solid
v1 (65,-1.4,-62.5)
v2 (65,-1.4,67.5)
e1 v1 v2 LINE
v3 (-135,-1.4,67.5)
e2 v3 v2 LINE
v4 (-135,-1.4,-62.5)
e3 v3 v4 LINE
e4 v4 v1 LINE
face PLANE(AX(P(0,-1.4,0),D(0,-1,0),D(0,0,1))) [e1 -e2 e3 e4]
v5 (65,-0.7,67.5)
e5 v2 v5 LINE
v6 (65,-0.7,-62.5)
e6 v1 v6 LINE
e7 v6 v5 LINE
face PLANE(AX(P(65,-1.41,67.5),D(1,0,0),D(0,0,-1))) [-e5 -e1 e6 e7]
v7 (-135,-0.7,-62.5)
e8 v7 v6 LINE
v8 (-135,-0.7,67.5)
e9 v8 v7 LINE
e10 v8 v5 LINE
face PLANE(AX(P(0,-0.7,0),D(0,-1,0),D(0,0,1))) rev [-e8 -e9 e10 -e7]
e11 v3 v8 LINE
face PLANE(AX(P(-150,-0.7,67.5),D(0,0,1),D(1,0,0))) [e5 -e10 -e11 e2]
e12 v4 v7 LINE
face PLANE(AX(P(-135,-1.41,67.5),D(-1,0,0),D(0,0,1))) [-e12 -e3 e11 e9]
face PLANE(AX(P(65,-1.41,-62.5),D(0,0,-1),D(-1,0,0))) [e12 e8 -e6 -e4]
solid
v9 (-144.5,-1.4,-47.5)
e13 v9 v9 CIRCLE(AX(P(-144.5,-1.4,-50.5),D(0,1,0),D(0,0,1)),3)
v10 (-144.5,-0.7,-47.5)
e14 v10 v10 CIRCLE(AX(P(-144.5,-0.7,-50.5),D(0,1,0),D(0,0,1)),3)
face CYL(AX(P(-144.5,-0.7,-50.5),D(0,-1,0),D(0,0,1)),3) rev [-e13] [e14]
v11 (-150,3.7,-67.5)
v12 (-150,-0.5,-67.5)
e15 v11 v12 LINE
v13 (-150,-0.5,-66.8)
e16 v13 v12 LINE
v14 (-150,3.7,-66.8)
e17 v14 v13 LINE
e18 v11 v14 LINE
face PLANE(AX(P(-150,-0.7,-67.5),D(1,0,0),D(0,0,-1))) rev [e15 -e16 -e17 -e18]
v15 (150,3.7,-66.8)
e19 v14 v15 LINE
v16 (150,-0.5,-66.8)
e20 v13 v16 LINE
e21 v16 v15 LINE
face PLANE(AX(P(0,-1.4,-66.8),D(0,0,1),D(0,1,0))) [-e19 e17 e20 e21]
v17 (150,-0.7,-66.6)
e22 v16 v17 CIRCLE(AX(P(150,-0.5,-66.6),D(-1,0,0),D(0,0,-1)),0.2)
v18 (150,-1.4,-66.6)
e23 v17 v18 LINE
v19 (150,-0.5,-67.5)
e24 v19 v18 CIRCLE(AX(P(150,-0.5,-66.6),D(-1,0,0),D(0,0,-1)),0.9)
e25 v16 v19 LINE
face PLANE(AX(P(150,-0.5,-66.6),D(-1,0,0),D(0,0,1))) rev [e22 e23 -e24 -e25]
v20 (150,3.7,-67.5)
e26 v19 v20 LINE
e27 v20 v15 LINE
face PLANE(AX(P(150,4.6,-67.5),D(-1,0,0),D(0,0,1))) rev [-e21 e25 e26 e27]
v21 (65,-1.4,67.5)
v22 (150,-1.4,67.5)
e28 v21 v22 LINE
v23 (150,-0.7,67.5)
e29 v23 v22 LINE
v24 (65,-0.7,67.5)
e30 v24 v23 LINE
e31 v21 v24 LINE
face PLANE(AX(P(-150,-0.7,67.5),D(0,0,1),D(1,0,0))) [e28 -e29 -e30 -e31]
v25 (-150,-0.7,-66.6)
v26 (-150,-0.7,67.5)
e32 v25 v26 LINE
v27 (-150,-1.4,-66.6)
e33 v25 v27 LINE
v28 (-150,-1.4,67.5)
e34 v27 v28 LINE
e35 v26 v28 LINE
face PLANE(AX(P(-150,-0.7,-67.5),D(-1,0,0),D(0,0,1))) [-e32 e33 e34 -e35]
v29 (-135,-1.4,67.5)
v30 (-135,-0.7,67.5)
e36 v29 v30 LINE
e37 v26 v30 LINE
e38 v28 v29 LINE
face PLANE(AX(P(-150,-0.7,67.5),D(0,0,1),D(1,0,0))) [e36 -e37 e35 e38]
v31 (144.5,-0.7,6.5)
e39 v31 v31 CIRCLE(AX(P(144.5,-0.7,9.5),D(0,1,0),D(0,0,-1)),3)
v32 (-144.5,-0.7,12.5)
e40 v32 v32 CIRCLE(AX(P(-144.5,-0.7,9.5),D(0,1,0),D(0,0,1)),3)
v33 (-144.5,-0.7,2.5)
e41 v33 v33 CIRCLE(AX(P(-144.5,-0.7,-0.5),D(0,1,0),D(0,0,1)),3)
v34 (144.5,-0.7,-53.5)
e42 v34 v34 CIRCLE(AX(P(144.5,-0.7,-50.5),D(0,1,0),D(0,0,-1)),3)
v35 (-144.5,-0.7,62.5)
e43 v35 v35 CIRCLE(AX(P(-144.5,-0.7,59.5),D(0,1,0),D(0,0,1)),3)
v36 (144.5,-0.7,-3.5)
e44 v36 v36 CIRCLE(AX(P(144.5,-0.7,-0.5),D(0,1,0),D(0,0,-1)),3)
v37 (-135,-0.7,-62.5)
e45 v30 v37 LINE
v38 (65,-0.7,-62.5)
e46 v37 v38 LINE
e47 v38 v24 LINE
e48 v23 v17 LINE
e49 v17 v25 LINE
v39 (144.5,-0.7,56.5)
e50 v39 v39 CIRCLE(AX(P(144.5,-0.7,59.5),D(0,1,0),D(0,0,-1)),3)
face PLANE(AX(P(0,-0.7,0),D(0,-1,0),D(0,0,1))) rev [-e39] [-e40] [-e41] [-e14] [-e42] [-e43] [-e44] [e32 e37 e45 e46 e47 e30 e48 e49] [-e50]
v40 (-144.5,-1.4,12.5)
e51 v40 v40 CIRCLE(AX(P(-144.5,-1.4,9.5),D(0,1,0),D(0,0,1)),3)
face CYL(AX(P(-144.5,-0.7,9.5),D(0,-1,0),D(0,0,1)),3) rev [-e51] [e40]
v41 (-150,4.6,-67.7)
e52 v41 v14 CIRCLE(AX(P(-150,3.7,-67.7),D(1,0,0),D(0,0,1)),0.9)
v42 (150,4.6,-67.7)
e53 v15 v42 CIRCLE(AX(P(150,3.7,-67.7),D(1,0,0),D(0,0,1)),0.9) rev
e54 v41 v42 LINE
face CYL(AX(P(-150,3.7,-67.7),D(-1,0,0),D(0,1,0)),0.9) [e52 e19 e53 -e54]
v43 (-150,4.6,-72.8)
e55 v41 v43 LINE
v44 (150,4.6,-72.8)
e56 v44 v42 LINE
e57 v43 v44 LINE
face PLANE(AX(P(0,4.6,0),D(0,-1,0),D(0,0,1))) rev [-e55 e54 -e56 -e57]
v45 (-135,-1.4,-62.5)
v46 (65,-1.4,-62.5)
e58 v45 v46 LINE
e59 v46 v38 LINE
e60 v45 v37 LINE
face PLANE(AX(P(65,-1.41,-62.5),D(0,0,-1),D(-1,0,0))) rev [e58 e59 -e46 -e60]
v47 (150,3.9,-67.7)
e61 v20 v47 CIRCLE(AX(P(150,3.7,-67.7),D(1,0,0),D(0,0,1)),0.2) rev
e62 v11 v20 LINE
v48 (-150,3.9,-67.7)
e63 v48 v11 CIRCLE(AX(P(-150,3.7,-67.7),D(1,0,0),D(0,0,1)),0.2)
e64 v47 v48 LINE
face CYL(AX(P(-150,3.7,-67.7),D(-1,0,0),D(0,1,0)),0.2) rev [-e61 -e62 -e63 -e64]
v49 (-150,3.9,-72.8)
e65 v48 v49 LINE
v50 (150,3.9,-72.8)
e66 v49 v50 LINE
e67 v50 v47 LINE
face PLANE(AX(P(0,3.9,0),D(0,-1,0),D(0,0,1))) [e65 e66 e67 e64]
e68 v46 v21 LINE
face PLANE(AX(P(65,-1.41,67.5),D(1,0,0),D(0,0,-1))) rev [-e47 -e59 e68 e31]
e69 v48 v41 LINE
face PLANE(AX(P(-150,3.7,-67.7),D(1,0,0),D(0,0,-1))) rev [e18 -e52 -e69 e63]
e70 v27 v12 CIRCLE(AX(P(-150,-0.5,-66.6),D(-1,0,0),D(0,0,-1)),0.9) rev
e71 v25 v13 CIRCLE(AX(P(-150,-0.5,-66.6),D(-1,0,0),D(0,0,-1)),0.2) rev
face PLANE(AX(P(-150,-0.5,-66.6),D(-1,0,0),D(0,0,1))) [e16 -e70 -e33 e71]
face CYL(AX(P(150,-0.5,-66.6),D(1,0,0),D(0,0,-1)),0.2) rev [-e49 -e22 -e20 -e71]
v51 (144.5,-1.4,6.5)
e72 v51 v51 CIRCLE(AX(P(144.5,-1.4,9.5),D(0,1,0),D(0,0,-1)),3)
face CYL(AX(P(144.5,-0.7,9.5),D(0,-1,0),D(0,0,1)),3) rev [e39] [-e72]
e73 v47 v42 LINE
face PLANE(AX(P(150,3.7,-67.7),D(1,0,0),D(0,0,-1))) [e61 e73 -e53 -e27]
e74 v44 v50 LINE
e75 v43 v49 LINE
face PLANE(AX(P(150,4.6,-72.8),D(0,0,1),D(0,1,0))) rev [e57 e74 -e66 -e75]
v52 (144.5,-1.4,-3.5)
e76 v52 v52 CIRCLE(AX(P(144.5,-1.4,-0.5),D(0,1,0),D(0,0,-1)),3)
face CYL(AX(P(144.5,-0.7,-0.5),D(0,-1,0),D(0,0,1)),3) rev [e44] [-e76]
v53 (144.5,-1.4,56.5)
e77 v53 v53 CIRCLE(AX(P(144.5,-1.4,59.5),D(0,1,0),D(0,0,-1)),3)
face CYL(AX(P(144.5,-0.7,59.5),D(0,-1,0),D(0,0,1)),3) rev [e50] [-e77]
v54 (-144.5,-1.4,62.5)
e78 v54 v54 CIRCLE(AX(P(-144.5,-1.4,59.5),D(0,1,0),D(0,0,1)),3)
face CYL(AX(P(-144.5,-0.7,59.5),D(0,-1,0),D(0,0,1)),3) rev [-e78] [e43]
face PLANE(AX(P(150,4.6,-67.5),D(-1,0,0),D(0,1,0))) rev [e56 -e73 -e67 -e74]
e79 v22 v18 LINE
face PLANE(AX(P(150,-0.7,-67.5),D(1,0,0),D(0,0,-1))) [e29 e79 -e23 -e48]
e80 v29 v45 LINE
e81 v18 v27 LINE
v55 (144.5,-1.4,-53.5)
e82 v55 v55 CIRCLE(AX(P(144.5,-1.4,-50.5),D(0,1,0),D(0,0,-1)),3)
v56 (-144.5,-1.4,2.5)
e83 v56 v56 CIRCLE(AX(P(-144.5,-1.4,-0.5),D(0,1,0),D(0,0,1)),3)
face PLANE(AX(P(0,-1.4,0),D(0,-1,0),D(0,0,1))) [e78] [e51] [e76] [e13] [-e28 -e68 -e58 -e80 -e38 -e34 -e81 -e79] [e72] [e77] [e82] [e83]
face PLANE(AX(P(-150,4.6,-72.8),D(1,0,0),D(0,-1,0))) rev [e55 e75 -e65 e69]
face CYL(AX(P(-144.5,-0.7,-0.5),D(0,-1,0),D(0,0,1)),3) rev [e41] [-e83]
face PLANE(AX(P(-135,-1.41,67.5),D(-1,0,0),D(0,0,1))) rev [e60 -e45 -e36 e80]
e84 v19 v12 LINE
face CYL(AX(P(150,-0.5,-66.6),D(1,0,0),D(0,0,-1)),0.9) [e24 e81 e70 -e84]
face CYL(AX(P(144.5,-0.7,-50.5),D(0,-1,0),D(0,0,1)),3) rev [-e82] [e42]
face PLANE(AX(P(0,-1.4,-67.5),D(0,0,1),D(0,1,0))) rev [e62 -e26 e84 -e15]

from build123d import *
from build123d.topology import SkipClean

# Parameters (mm, degrees)
SKETCH_1_W                       = 300
SKETCH_1_H                       = 135
SKETCH_1_R                       = 3
SM_BASE_FLANGE_1_DEPTH           = 0.7
SM_EDGE_FLANGE_1_STRIP_W         = 3.2
SM_EDGE_FLANGE_1_STRIP_H         = 0.7
SM_EDGE_FLANGE_1_STRIP_CUT_DEPTH = 300
SM_EDGE_FLANGE_1_DEPTH           = 300
SM_EDGE_FLANGE_2_STRIP_W         = 3.2
SM_EDGE_FLANGE_2_STRIP_H         = 0.7
SM_EDGE_FLANGE_2_STRIP_CUT_DEPTH = 300
SM_EDGE_FLANGE_2_DEPTH           = 300
MOVE_START                       = -0.5
MOVE_BODY_1_OUTLINE_W            = 300
MOVE_BODY_1_OUTLINE_H            = 134.3
MOVE_BODY_1_OUTLINE_R            = 3
MOVE_BODY_1_DEPTH                = 0.5
MOVE_START_2                     = -6
MOVE_BODY_1_2_OUTLINE_W          = 300
MOVE_BODY_1_2_OUTLINE_H          = 6
MOVE_BODY_1_2_DEPTH              = 4.6
MOVE_START_3                     = -1.343604
MOVE_BODY_1_3_OUTLINE_W          = 300
MOVE_BODY_1_3_OUTLINE_H          = 134.3
MOVE_BODY_1_3_OUTLINE_R          = 3
MOVE_BODY_1_3_DEPTH              = 0.643604
MOVE_BODY_1_4_OUTLINE_W          = 300
MOVE_BODY_1_4_OUTLINE_H          = 0.7
MOVE_BODY_1_4_DEPTH              = 4.2
MOVE_START_4                     = -1.4
MOVE_BODY_1_5_OUTLINE_W          = 300
MOVE_BODY_1_5_OUTLINE_H          = 134.3
MOVE_BODY_1_5_OUTLINE_R          = 3
MOVE_BODY_1_5_DEPTH              = 0.056396
MOVE_START_5                     = 3.7
MOVE_BODY_1_6_OUTLINE_W          = 300
MOVE_BODY_1_6_OUTLINE_H          = 6
MOVE_BODY_1_6_DEPTH              = 0.9
MOVE_START_6                     = -0.7
MOVE_BODY_1_7_OUTLINE_W          = 300
MOVE_BODY_1_7_OUTLINE_H          = 0.7
MOVE_BODY_1_7_DEPTH              = 0.2
MOVE_START_7                     = -151
MOVE_BODY_1_8_DEPTH              = 301
SPLIT_BODIES_1_SURFACE_1_BACK    = 332.24
SPLIT_BODIES_1_SURFACE_1_DEPTH   = 664.48
SPLIT_BODIES_1_SURFACE_2_BACK    = 332.24
SPLIT_BODIES_1_SURFACE_2_DEPTH   = 664.48


with BuildPart() as part:
    # 基体-法兰1: sheet metal written as solids
    # 草图1 → 基体-法兰1 (new body)
    with BuildSketch(Plane(origin=(0, 0, 0), x_dir=(1, 0, 0), z_dir=(0, 1, 0))):
        Rectangle(SKETCH_1_W, SKETCH_1_H)
        with Locations(Location((-144.5, -59.5, 0), (0, 0, 270))):
            Circle(SKETCH_1_R, mode=Mode.SUBTRACT)
        with Locations(Location((-144.5, -9.5, 0), (0, 0, 270))):
            Circle(SKETCH_1_R, mode=Mode.SUBTRACT)
        with Locations(Location((-144.5, 0.5, 0), (0, 0, 270))):
            Circle(SKETCH_1_R, mode=Mode.SUBTRACT)
        with Locations(Location((-144.5, 50.5, 0), (0, 0, 270))):
            Circle(SKETCH_1_R, mode=Mode.SUBTRACT)
        with Locations(Location((144.5, -59.5, 0), (0, 0, 90))):
            Circle(SKETCH_1_R, mode=Mode.SUBTRACT)
        with Locations(Location((144.5, -9.5, 0), (0, 0, 90))):
            Circle(SKETCH_1_R, mode=Mode.SUBTRACT)
        with Locations(Location((144.5, 0.5, 0), (0, 0, 90))):
            Circle(SKETCH_1_R, mode=Mode.SUBTRACT)
        with Locations(Location((144.5, 50.5, 0), (0, 0, 90))):
            Circle(SKETCH_1_R, mode=Mode.SUBTRACT)
    extrude(amount=-SM_BASE_FLANGE_1_DEPTH)

    # 边线-法兰1: sheet metal written as solids
    # 边线-法兰1 strip (on a plane across the edge) → 边线-法兰1 strip cut (cut)
    with BuildSketch(Plane(origin=(-150, -0.7, -67.5), x_dir=(0, 0, 1), z_dir=(1, 0, 0))):
        with Locations((-0.7, -0.35)):
            Rectangle(SM_EDGE_FLANGE_1_STRIP_W, SM_EDGE_FLANGE_1_STRIP_H)
    extrude(amount=SM_EDGE_FLANGE_1_STRIP_CUT_DEPTH, mode=Mode.SUBTRACT)

    # 边线-法兰1 section (on a plane across the edge) → 边线-法兰1 (add)
    with BuildSketch(Plane(origin=(-150, -0.7, -67.5), x_dir=(0, 0, 1), z_dir=(1, 0, 0))):
        with BuildLine():
            Line((0, 0.2), (0, 5.3))
            Line((0, 5.3), (0.7, 5.3))
            Line((0.7, 5.3), (0.7, 0.2))
            ThreePointArc((0.7, 0.2), (0.758578644, 0.058578644), (0.9, 0))
            Line((0.9, 0), (0.9, -0.7))
            ThreePointArc((0.9, -0.7), (0.263603897, -0.436396103), (0, 0.2))
        make_face()
    extrude(amount=SM_EDGE_FLANGE_1_DEPTH)

    # 边线-法兰2: sheet metal written as solids
    # 边线-法兰2 strip (on a plane across the edge) → 边线-法兰2 strip cut (cut)
    with BuildSketch(Plane(origin=(150, -6, -67.5), x_dir=(0, 1, 0), z_dir=(-1, 0, 0))):
        with Locations((-0.7, -0.35)):
            Rectangle(SM_EDGE_FLANGE_2_STRIP_W, SM_EDGE_FLANGE_2_STRIP_H)
    extrude(amount=SM_EDGE_FLANGE_2_STRIP_CUT_DEPTH, mode=Mode.SUBTRACT)

    # 边线-法兰2 section (on a plane across the edge) → 边线-法兰2 (add)
    with BuildSketch(Plane(origin=(150, -6, -67.5), x_dir=(0, 1, 0), z_dir=(-1, 0, 0))):
        with BuildLine():
            Line((0, 0.2), (0, 5.3))
            Line((0, 5.3), (0.7, 5.3))
            Line((0.7, 5.3), (0.7, 0.2))
            ThreePointArc((0.7, 0.2), (0.758578644, 0.058578644), (0.9, 0))
            Line((0.9, 0), (0.9, -0.7))
            ThreePointArc((0.9, -0.7), (0.263603897, -0.436396103), (0, 0.2))
        make_face()
    extrude(amount=SM_EDGE_FLANGE_2_DEPTH)

    # Move Body 1: read off the stored shape, not the designer's step
    # Move Body 1 outline → Move Body 1 (cut)
    with BuildSketch(Plane(origin=(0, 0, 0), x_dir=(1, 0, 0), z_dir=(0, 1, 0)).offset(MOVE_START)):
        with Locations((0, -0.35)):
            Rectangle(MOVE_BODY_1_OUTLINE_W, MOVE_BODY_1_OUTLINE_H)
        with Locations((-144.5, -59.5)):
            Circle(MOVE_BODY_1_OUTLINE_R, mode=Mode.SUBTRACT)
        with Locations((-144.5, -9.5)):
            Circle(MOVE_BODY_1_OUTLINE_R, mode=Mode.SUBTRACT)
        with Locations((-144.5, 0.5)):
            Circle(MOVE_BODY_1_OUTLINE_R, mode=Mode.SUBTRACT)
        with Locations((144.5, -59.5)):
            Circle(MOVE_BODY_1_OUTLINE_R, mode=Mode.SUBTRACT)
        with Locations((144.5, -9.5)):
            Circle(MOVE_BODY_1_OUTLINE_R, mode=Mode.SUBTRACT)
        with Locations((144.5, 0.5)):
            Circle(MOVE_BODY_1_OUTLINE_R, mode=Mode.SUBTRACT)
        with Locations((-144.5, 50.5)):
            Circle(MOVE_BODY_1_OUTLINE_R, mode=Mode.SUBTRACT)
        with Locations((144.5, 50.5)):
            Circle(MOVE_BODY_1_OUTLINE_R, mode=Mode.SUBTRACT)
    extrude(amount=MOVE_BODY_1_DEPTH, mode=Mode.SUBTRACT)

    # Move Body 1 2 outline → Move Body 1 2 (cut)
    with BuildSketch(Plane(origin=(0, 0, 0), x_dir=(1, 0, 0), z_dir=(0, 1, 0)).offset(MOVE_START_2)):
        with Locations((0, 69.8)):
            Rectangle(MOVE_BODY_1_2_OUTLINE_W, MOVE_BODY_1_2_OUTLINE_H)
    extrude(amount=MOVE_BODY_1_2_DEPTH, mode=Mode.SUBTRACT)

    # Move Body 1 3 outline → Move Body 1 3 (add)
    with SkipClean():  # the faces are left unmerged after this step: merging them gives an invalid solid
        with BuildSketch(Plane(origin=(0, 0, 0), x_dir=(1, 0, 0), z_dir=(0, 1, 0)).offset(MOVE_START_3)):
            with Locations((0, -0.35)):
                Rectangle(MOVE_BODY_1_3_OUTLINE_W, MOVE_BODY_1_3_OUTLINE_H)
            with Locations((-144.5, -59.5)):
                Circle(MOVE_BODY_1_3_OUTLINE_R, mode=Mode.SUBTRACT)
            with Locations((-144.5, -9.5)):
                Circle(MOVE_BODY_1_3_OUTLINE_R, mode=Mode.SUBTRACT)
            with Locations((-144.5, 0.5)):
                Circle(MOVE_BODY_1_3_OUTLINE_R, mode=Mode.SUBTRACT)
            with Locations((144.5, -59.5)):
                Circle(MOVE_BODY_1_3_OUTLINE_R, mode=Mode.SUBTRACT)
            with Locations((144.5, -9.5)):
                Circle(MOVE_BODY_1_3_OUTLINE_R, mode=Mode.SUBTRACT)
            with Locations((144.5, 0.5)):
                Circle(MOVE_BODY_1_3_OUTLINE_R, mode=Mode.SUBTRACT)
            with Locations((-144.5, 50.5)):
                Circle(MOVE_BODY_1_3_OUTLINE_R, mode=Mode.SUBTRACT)
            with Locations((144.5, 50.5)):
                Circle(MOVE_BODY_1_3_OUTLINE_R, mode=Mode.SUBTRACT)
        extrude(amount=MOVE_BODY_1_3_DEPTH)

    # Move Body 1 4 outline → Move Body 1 4 (add)
    with SkipClean():  # the faces are left unmerged after this step: merging them gives an invalid solid
        with BuildSketch(Plane(origin=(0, 0, 0), x_dir=(1, 0, 0), z_dir=(0, 1, 0)).offset(MOVE_START)):
            with Locations((0, 67.15)):
                Rectangle(MOVE_BODY_1_4_OUTLINE_W, MOVE_BODY_1_4_OUTLINE_H)
        extrude(amount=MOVE_BODY_1_4_DEPTH)

    # Move Body 1 5 outline → Move Body 1 5 (add)
    with SkipClean():  # the faces are left unmerged after this step: merging them gives an invalid solid
        with BuildSketch(Plane(origin=(0, 0, 0), x_dir=(1, 0, 0), z_dir=(0, 1, 0)).offset(MOVE_START_4)):
            with Locations((0, -0.35)):
                Rectangle(MOVE_BODY_1_5_OUTLINE_W, MOVE_BODY_1_5_OUTLINE_H)
            with Locations((-144.5, -59.5)):
                Circle(MOVE_BODY_1_5_OUTLINE_R, mode=Mode.SUBTRACT)
            with Locations((-144.5, -9.5)):
                Circle(MOVE_BODY_1_5_OUTLINE_R, mode=Mode.SUBTRACT)
            with Locations((-144.5, 0.5)):
                Circle(MOVE_BODY_1_5_OUTLINE_R, mode=Mode.SUBTRACT)
            with Locations((144.5, -59.5)):
                Circle(MOVE_BODY_1_5_OUTLINE_R, mode=Mode.SUBTRACT)
            with Locations((144.5, -9.5)):
                Circle(MOVE_BODY_1_5_OUTLINE_R, mode=Mode.SUBTRACT)
            with Locations((144.5, 0.5)):
                Circle(MOVE_BODY_1_5_OUTLINE_R, mode=Mode.SUBTRACT)
            with Locations((-144.5, 50.5)):
                Circle(MOVE_BODY_1_5_OUTLINE_R, mode=Mode.SUBTRACT)
            with Locations((144.5, 50.5)):
                Circle(MOVE_BODY_1_5_OUTLINE_R, mode=Mode.SUBTRACT)
        extrude(amount=MOVE_BODY_1_5_DEPTH)

    # Move Body 1 6 outline → Move Body 1 6 (add)
    with SkipClean():  # the faces are left unmerged after this step: merging them gives an invalid solid
        with BuildSketch(Plane(origin=(0, 0, 0), x_dir=(1, 0, 0), z_dir=(0, 1, 0)).offset(MOVE_START_5)):
            with Locations((0, 69.8)):
                Rectangle(MOVE_BODY_1_6_OUTLINE_W, MOVE_BODY_1_6_OUTLINE_H)
        extrude(amount=MOVE_BODY_1_6_DEPTH)

    # Move Body 1 7 outline → Move Body 1 7 (add)
    with SkipClean():  # the faces are left unmerged after this step: merging them gives an invalid solid
        with BuildSketch(Plane(origin=(0, 0, 0), x_dir=(1, 0, 0), z_dir=(0, 1, 0)).offset(MOVE_START_6)):
            with Locations((0, 67.15)):
                Rectangle(MOVE_BODY_1_7_OUTLINE_W, MOVE_BODY_1_7_OUTLINE_H)
        extrude(amount=MOVE_BODY_1_7_DEPTH)

    # Move Body 1 8 outline → Move Body 1 8 (cut)
    with BuildSketch(Plane.YZ.offset(MOVE_START_7)):
        with BuildLine():
            Line((-0.5, 67.5), (-0.7, 67.5))
            Line((-0.7, 67.5), (-0.7, -66.6))
            ThreePointArc((-0.7, -66.6), (-0.641421356, -66.741421356), (-0.5, -66.8))
            Line((-0.5, -66.8), (-0.5, 67.5))
        make_face()
        with BuildLine():
            ThreePointArc((-0.7, -67.477496439), (-1.203562364, -67.161248608), (-1.4, -66.6))
            Line((-1.4, -66.6), (-1.4, -67.5))
            Line((-1.4, -67.5), (-0.9, -67.5))
            ThreePointArc((-0.9, -67.5), (-0.799368978, -67.494356415), (-0.7, -67.477496439))
        make_face()
        with BuildLine():
            Line((4.6, -66.8), (3.7, -66.8))
            ThreePointArc((3.7, -66.8), (4.336396103, -67.063603897), (4.6, -67.7))
            Line((4.6, -67.7), (4.6, -66.8))
        make_face()
        with BuildLine():
            ThreePointArc((-0.5, -67.5), (-0.600631022, -67.494356415), (-0.7, -67.477496439))
            Line((-0.7, -67.477496439), (-0.7, -67.5))
            Line((-0.7, -67.5), (-0.5, -67.5))
        make_face()
        with BuildLine():
            ThreePointArc((3.9, -67.7), (3.841421356, -67.558578644), (3.7, -67.5))
            Line((3.7, -67.5), (3.7, -72.8))
            Line((3.7, -72.8), (3.9, -72.8))
            Line((3.9, -72.8), (3.9, -67.7))
        make_face()
    extrude(amount=MOVE_BODY_1_8_DEPTH, mode=Mode.SUBTRACT)


with BuildPart() as body_2:
    # Split Bodies 1: the piece behind the surface
    add(part.part)
    # Split Bodies 1 surface: a surface, the sketch's curves swept straight by 664.48 mm
    with BuildLine(Plane(origin=(0, -0.7, 0), x_dir=(1, 0, 0), z_dir=(0, 1, 0)).offset(-SPLIT_BODIES_1_SURFACE_1_BACK), mode=Mode.PRIVATE) as split_bodies_1_surface_1_path:
        Line((65, -67.5), (-135, -67.5))
        Line((-135, -67.5), (-135, 62.5))
        Line((-135, 62.5), (65, 62.5))
        Line((65, 62.5), (65, -67.5))
    split_bodies_1_surface_1 = Shell.extrude(split_bodies_1_surface_1_path.wire(), (0 * SPLIT_BODIES_1_SURFACE_1_DEPTH, 1 * SPLIT_BODIES_1_SURFACE_1_DEPTH, 0 * SPLIT_BODIES_1_SURFACE_1_DEPTH))
    split(bisect_by=split_bodies_1_surface_1, keep=Keep.BOTTOM)


with BuildPart() as part_1:
    add(part.part)

    # Split Bodies 1: split by a surface, the side it looks to stays
    # Split Bodies 1 surface: a surface, the sketch's curves swept straight by 664.48 mm
    with BuildLine(Plane(origin=(0, -0.7, 0), x_dir=(1, 0, 0), z_dir=(0, 1, 0)).offset(-SPLIT_BODIES_1_SURFACE_2_BACK), mode=Mode.PRIVATE) as split_bodies_1_surface_2_path:
        Line((65, -67.5), (-135, -67.5))
        Line((-135, -67.5), (-135, 62.5))
        Line((-135, 62.5), (65, 62.5))
        Line((65, 62.5), (65, -67.5))
    split_bodies_1_surface_2 = Shell.extrude(split_bodies_1_surface_2_path.wire(), (0 * SPLIT_BODIES_1_SURFACE_2_DEPTH, 1 * SPLIT_BODIES_1_SURFACE_2_DEPTH, 0 * SPLIT_BODIES_1_SURFACE_2_DEPTH))
    split(bisect_by=split_bodies_1_surface_2, keep=Keep.TOP)


solid = Compound([body_2.part, part_1.part])
